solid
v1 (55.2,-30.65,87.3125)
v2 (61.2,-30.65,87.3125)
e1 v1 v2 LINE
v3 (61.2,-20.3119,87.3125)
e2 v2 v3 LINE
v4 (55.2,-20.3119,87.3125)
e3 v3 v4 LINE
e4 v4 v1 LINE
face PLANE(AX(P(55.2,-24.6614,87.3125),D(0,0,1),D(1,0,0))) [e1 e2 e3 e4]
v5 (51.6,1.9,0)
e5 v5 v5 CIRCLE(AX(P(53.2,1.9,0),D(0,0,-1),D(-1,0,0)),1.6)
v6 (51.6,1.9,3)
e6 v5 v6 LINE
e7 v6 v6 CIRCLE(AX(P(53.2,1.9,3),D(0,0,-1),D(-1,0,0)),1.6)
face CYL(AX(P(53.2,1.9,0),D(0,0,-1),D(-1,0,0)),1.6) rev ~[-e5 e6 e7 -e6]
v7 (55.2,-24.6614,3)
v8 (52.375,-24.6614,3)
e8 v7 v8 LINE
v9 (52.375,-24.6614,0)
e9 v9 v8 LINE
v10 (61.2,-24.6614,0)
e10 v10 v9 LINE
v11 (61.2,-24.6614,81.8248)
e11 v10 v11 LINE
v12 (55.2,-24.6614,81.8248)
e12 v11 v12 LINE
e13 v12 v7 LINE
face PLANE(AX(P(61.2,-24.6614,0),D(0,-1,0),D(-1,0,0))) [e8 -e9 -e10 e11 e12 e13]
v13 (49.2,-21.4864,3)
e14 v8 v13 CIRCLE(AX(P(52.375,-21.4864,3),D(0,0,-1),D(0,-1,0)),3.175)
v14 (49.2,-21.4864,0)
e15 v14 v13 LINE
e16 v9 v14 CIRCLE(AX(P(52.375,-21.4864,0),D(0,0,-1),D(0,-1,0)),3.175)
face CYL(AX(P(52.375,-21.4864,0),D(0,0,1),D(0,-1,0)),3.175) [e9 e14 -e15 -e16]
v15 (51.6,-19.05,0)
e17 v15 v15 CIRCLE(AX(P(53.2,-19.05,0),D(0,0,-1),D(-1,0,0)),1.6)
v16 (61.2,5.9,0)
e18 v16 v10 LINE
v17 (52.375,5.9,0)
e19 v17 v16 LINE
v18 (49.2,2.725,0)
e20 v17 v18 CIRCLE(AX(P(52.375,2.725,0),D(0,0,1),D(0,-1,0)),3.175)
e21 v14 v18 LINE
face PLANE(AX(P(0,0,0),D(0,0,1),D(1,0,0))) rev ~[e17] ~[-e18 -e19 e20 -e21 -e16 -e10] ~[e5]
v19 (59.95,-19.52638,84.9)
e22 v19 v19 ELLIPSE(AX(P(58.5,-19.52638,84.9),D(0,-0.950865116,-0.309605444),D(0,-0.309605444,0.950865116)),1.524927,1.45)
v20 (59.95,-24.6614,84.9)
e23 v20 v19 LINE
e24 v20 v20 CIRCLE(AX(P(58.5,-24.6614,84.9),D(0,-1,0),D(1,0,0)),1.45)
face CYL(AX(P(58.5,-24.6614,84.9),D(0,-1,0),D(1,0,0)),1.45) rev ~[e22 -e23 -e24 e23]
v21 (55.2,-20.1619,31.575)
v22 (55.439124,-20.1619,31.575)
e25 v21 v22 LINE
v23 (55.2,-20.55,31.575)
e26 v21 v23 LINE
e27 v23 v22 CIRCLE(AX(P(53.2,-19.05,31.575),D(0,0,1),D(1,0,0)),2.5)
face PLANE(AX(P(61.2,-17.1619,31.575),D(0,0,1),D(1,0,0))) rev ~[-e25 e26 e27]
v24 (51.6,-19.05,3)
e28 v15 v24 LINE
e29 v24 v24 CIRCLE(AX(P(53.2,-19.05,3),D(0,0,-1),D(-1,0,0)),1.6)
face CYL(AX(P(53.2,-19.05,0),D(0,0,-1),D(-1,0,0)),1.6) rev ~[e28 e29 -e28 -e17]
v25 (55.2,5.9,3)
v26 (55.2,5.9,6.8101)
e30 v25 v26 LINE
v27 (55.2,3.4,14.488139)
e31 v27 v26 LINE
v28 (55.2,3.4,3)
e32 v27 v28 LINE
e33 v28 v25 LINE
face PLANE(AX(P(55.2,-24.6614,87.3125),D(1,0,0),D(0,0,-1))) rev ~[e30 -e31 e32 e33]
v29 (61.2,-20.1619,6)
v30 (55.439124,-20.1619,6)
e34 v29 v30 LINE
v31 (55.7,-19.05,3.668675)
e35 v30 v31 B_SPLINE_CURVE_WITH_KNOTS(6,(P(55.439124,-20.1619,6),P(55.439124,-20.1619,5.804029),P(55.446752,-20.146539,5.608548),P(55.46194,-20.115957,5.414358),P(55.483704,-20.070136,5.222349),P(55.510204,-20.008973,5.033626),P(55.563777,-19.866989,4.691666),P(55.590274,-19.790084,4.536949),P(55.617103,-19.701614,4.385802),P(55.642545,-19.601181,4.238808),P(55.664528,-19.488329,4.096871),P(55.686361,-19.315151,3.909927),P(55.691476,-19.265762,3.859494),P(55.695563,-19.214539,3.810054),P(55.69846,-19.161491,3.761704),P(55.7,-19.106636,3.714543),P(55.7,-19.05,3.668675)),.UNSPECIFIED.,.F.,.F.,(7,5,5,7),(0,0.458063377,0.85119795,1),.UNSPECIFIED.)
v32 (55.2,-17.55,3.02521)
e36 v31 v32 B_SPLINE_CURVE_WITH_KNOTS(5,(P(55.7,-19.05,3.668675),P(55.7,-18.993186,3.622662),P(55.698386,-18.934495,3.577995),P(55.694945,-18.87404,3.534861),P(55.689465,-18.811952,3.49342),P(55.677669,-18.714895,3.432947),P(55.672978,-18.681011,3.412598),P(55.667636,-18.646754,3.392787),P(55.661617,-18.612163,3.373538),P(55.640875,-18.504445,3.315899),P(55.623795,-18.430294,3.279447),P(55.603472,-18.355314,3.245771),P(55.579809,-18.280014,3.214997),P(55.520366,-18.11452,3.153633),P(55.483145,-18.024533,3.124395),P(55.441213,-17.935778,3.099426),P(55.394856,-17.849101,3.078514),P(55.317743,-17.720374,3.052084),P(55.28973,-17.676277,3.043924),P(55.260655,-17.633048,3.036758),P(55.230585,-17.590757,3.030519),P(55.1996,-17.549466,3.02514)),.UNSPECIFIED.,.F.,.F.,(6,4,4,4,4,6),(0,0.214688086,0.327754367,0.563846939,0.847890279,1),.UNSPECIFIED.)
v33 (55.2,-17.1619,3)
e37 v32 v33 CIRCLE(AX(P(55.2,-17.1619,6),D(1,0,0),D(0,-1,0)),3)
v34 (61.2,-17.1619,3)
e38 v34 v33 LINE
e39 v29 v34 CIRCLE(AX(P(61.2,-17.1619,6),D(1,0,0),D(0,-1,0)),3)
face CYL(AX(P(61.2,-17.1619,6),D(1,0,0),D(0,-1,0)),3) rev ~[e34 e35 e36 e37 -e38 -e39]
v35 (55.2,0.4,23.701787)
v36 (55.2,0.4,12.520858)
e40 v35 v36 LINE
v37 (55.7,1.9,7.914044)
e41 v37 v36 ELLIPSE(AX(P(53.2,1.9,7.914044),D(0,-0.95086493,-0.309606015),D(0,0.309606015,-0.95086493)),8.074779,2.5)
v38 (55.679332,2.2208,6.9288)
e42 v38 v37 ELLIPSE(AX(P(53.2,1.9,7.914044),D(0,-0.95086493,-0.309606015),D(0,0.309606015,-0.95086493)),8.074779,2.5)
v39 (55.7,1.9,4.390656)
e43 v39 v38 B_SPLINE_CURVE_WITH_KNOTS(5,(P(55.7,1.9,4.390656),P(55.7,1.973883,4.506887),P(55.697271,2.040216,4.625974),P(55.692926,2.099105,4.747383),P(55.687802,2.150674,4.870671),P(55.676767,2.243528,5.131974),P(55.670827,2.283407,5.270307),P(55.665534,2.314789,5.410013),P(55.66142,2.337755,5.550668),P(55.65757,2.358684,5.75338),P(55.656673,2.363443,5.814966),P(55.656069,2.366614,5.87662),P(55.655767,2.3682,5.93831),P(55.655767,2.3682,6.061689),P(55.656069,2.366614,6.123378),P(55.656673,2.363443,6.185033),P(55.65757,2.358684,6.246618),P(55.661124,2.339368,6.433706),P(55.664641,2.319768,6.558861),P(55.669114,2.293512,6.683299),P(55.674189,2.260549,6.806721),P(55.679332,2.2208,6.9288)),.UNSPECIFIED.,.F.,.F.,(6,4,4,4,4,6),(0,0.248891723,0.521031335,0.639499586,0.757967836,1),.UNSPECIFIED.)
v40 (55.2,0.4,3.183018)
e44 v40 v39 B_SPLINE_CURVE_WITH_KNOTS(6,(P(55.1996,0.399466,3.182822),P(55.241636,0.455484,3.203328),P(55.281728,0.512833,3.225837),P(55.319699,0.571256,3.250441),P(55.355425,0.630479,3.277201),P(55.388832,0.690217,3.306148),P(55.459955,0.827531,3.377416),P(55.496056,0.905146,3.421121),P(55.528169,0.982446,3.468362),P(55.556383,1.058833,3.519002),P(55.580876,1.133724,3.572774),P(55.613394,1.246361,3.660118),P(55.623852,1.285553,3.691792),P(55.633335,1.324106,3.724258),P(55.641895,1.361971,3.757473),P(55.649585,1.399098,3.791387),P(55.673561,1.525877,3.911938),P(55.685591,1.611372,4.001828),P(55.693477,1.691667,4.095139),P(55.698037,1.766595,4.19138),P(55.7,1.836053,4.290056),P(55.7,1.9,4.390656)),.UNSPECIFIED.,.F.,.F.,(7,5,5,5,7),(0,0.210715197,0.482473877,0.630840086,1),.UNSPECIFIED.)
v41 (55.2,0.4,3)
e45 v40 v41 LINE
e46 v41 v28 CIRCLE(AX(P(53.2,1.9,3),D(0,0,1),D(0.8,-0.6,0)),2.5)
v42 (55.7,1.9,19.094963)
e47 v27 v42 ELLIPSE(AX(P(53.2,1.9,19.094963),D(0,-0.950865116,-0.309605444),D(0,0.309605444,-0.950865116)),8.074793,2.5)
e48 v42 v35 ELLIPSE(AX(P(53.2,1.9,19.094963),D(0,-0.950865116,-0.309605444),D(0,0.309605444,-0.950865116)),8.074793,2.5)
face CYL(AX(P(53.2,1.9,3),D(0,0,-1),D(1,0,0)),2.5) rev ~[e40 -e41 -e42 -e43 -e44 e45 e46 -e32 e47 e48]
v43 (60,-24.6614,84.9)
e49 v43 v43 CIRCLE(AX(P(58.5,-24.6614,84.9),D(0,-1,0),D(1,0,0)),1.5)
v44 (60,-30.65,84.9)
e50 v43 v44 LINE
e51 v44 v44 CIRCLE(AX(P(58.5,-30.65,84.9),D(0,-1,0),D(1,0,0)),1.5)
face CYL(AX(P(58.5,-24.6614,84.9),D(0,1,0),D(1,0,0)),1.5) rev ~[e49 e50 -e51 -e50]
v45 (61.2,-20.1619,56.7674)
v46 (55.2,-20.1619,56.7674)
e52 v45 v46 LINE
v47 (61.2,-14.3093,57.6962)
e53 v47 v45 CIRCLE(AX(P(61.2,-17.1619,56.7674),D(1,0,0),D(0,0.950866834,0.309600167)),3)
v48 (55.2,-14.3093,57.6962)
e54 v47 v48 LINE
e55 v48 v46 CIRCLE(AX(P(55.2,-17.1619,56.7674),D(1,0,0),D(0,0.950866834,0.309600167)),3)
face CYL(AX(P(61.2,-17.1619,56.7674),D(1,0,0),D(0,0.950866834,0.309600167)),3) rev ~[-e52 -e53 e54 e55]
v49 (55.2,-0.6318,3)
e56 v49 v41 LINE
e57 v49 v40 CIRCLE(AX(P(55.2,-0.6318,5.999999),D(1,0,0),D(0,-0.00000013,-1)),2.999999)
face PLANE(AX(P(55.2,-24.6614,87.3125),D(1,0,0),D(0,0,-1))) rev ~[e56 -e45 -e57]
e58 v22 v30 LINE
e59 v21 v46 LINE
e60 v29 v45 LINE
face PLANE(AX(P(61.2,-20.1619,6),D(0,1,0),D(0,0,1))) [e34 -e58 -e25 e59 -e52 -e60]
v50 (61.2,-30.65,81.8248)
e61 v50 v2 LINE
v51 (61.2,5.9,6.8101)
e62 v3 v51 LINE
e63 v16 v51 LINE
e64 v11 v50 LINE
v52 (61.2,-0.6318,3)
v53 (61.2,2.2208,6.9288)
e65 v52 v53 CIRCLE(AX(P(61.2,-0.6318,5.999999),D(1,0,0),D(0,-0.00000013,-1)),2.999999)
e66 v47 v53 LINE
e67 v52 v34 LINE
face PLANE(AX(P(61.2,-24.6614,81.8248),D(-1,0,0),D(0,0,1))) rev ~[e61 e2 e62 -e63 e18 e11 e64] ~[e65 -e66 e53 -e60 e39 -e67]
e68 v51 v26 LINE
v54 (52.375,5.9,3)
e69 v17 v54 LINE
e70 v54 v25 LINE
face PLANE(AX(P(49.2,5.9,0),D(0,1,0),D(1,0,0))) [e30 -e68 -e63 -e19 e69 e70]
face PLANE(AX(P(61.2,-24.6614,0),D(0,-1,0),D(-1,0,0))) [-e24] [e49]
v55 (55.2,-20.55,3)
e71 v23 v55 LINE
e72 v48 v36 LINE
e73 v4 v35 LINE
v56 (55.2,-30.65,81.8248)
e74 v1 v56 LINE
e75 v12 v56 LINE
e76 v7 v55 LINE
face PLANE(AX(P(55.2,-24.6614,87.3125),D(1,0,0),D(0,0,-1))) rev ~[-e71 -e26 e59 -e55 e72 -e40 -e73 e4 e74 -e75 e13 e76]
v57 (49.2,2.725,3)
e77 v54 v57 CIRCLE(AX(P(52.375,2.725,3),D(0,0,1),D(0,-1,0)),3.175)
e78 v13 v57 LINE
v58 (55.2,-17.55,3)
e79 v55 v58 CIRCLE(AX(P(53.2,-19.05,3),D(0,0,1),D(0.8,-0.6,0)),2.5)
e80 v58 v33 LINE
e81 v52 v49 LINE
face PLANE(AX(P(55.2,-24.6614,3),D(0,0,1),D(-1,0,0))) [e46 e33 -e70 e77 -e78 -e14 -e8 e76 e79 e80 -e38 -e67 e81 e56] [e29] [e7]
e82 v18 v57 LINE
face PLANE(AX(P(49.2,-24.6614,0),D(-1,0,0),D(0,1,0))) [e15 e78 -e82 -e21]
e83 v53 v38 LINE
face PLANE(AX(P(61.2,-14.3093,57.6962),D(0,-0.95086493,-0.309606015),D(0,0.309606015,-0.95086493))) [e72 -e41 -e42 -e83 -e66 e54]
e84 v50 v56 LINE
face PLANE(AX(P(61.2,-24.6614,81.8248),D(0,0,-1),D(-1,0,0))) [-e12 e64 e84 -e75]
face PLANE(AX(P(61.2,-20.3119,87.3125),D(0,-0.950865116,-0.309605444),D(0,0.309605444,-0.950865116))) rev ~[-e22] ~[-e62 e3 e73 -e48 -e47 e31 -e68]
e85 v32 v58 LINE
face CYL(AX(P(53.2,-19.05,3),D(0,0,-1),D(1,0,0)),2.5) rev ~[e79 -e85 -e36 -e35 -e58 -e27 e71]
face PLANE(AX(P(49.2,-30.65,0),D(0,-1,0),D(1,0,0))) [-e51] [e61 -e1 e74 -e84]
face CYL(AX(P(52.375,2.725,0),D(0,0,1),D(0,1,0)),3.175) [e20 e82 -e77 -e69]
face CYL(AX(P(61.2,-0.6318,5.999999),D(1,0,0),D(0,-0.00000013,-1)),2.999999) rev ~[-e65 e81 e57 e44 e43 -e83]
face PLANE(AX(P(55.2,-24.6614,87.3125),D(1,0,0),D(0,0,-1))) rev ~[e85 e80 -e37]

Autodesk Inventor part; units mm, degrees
ref_plane "YZ Plane" through (0, 0, 0) normal (1, 0, 0) x (0, 1, 0)
ref_plane "XZ Plane" through (0, 0, 0) normal (0, 1, 0) x (-1, 0, 0)
ref_plane "Płaszczyzna konstrukcyjna2" through (0, 0, 0) normal (0, 0, 1) x (1, 0, 0)
sketch "Szkic2" plane through (0, 0, 0) normal (0, 0, 1) x (1, 0, 0)
  circle A0 centre (53.2, -19.05) radius 2 projected
  circle A1 centre (53.2, 1.9) radius 2 projected
  line L0 (61.2, -24.6614) -> (49.2, -24.6614)
  line L1 (49.2, -24.6614) -> (49.2, 5.9)
  line L2 (49.2, 5.9) -> (61.2, 5.9)
  line L3 (61.2, 5.9) -> (61.2, -24.6614)
  line L4 (60, -30.65) -> (57, -30.65) projected
  point P0 (0, 0)
  dimension "d0" = 4
  dimension "d1" = 4
  dimension "d2" = 12
  dimension "d3" = 30.5614
extrude "Wyciągnięcie proste1" add sketch "Szkic2" along normal blind 87.3125 contours A0 | A1 | L0 L1 L2 L3
sketch "Szkic3" plane through (49.2, -24.6614, 0) normal (0, -1, 0) x (1, 0, 0)
  circle A0 centre (9.3, 84.9) radius 1.5 projected
  circle A1 centre (9.3, 84.9) radius 1.45
  point P0 (-49.2, 0)
  dimension "d6" = 2.9
extrude "Wyciągnięcie proste2" cut sketch "Szkic3" against normal blind 10 contours A1
sketch "Szkic4" plane through (0, 0, 0) normal (0, 0, -1) x (-1, 0, 0)
  point P0 (0, 0)
sketch "Szkic6" plane through (61.2, -24.6614, 0) normal (1, 0, 0) x (0, 0, -1)
  point P0 (0, 24.6614)
sketch "Szkic5" plane through (0, 0, 0) normal (0, 0, -1) x (-1, 0, 0)
  circle A0 centre (-53.2, 1.9) radius 2 projected
  circle A1 centre (-53.2, -19.05) radius 2 projected
  circle A2 centre (-53.2, -19.05) radius 1.6
  circle A3 centre (-53.2, 1.9) radius 1.6
  point P0 (0, 0)
  dimension "d9" = 3.2
  dimension "d10" = 3.2
extrude "Wyciągnięcie proste3" cut sketch "Szkic5" against normal blind 6 contours A2 | A3
sketch "Szkic7" plane through (61.2, -24.6614, 0) normal (1, 0, 0) x (0, 0, -1)
  line L0 (-87.3125, 30.5614) -> (-87.3125, 0) projected
  line L1 (-87.3125, 4.3495) -> (-6.8101, 30.5614)
  line L2 (-57.6962, 10.3521) -> (-6.9288, 26.8822)
  line L3 (0, 28.1614) -> (-6, 28.1614) projected
  line L4 (-3, 24.0296) -> (-3, 7.4995)
  line L5 (-6, 4.4995) -> (-56.7674, 4.4995)
  line L6 (0, 30.5614) -> (-87.3125, 30.5614) projected
  arc A0 (-57.6962, 10.3521) -> (-56.7674, 4.4995) centre (-56.7674, 7.4995) ccw
  arc A1 (-6, 4.4995) -> (-3, 7.4995) centre (-6, 7.4995) ccw
  arc A2 (-3, 24.0296) -> (-6.9288, 26.8822) centre (-6, 24.0296) ccw
  point P0 (0, 24.6614)
  point P1 (-75.6708, 4.4995)
  point P2 (-3, 28.1614)
  point P3 (-3, 4.4995)
  dimension "d17" = 3
extrude "Wyciągnięcie proste4" cut sketch "Szkic7" against normal blind 14.7625
sketch "Szkic8" plane through (49.2, -24.6614, 0) normal (0, -1, 0) x (1, 0, 0)
  line L0 (0, 87.3125) -> (12, 87.3125) projected
  line L1 (0, 0) -> (0, 6.8101) projected
  line L2 (12, 0) -> (12, 87.3125) projected
  line L3 (0, 0) -> (0, 87.3125) projected
  line L4 (0, 0) -> (12, 0) projected
  line L5 (6, 87.3125) -> (6, 3)
  line L6 (12, 3) -> (0, 3) projected
  point P0 (-49.2, 0)
extrude "Wyciągnięcie proste5" cut sketch "Szkic8" against normal blind 30.6375 contours L0 L5 L6 L1 L3
sketch "Szkic9" plane through (49.2, -24.6614, 0) normal (0, -1, 0) x (1, 0, 0)
  line L0 (6, 87.3125) -> (6, 3) projected
  line L1 (12, 6.8101) -> (12, 87.3125) projected
  line L2 (6, 87.3125) -> (12, 87.3125)
  line L3 (12, 87.3125) -> (12, 81.8248)
  line L4 (12, 81.8248) -> (6, 81.8248)
  line L5 (6, 81.8248) -> (6, 87.3125)
  circle A0 centre (9.3, 84.9) radius 1.5 projected
  point P0 (-49.2, 0)
ref_plane "Płaszczyzna konstrukcyjna3" through (-147.5, -30.65, -16.2) normal (0, 1, 0) x (0, 0, 1)
extrude "Wyciągnięcie proste6" add sketch "Szkic9" along normal up to surface (5.9886 mm away)
sketch "Szkic10" plane through (61.2, -17.1619, 3) normal (0, 0, 1) x (1, 0, 0)
  point P0 (-61.2, 17.1619)
sketch "Szkic11" plane through (61.2, -17.1619, 3) normal (0, 0, 1) x (1, 0, 0)
  circle A0 centre (-8, -1.8881) radius 1.6 projected
  circle A1 centre (-8, 19.0619) radius 1.6 projected
  circle A2 centre (-8, -1.8881) radius 1.6 projected
  circle A3 centre (-8, -1.8881) radius 2.5
  circle A4 centre (-8, 19.0619) radius 2.5
  point P0 (-61.2, 17.1619)
  dimension "d20" = 5
extrude "Wyciągnięcie proste7" cut sketch "Szkic11" along normal blind 28.575 contours A0 | A1 | A3 | A4
fillet "Zaokrąglenie1" radius 3.175 2 edges at (49.2, 5.9, 1.5) (49.2, -24.6614, 1.5)
properties part number "wzmocnienie"
